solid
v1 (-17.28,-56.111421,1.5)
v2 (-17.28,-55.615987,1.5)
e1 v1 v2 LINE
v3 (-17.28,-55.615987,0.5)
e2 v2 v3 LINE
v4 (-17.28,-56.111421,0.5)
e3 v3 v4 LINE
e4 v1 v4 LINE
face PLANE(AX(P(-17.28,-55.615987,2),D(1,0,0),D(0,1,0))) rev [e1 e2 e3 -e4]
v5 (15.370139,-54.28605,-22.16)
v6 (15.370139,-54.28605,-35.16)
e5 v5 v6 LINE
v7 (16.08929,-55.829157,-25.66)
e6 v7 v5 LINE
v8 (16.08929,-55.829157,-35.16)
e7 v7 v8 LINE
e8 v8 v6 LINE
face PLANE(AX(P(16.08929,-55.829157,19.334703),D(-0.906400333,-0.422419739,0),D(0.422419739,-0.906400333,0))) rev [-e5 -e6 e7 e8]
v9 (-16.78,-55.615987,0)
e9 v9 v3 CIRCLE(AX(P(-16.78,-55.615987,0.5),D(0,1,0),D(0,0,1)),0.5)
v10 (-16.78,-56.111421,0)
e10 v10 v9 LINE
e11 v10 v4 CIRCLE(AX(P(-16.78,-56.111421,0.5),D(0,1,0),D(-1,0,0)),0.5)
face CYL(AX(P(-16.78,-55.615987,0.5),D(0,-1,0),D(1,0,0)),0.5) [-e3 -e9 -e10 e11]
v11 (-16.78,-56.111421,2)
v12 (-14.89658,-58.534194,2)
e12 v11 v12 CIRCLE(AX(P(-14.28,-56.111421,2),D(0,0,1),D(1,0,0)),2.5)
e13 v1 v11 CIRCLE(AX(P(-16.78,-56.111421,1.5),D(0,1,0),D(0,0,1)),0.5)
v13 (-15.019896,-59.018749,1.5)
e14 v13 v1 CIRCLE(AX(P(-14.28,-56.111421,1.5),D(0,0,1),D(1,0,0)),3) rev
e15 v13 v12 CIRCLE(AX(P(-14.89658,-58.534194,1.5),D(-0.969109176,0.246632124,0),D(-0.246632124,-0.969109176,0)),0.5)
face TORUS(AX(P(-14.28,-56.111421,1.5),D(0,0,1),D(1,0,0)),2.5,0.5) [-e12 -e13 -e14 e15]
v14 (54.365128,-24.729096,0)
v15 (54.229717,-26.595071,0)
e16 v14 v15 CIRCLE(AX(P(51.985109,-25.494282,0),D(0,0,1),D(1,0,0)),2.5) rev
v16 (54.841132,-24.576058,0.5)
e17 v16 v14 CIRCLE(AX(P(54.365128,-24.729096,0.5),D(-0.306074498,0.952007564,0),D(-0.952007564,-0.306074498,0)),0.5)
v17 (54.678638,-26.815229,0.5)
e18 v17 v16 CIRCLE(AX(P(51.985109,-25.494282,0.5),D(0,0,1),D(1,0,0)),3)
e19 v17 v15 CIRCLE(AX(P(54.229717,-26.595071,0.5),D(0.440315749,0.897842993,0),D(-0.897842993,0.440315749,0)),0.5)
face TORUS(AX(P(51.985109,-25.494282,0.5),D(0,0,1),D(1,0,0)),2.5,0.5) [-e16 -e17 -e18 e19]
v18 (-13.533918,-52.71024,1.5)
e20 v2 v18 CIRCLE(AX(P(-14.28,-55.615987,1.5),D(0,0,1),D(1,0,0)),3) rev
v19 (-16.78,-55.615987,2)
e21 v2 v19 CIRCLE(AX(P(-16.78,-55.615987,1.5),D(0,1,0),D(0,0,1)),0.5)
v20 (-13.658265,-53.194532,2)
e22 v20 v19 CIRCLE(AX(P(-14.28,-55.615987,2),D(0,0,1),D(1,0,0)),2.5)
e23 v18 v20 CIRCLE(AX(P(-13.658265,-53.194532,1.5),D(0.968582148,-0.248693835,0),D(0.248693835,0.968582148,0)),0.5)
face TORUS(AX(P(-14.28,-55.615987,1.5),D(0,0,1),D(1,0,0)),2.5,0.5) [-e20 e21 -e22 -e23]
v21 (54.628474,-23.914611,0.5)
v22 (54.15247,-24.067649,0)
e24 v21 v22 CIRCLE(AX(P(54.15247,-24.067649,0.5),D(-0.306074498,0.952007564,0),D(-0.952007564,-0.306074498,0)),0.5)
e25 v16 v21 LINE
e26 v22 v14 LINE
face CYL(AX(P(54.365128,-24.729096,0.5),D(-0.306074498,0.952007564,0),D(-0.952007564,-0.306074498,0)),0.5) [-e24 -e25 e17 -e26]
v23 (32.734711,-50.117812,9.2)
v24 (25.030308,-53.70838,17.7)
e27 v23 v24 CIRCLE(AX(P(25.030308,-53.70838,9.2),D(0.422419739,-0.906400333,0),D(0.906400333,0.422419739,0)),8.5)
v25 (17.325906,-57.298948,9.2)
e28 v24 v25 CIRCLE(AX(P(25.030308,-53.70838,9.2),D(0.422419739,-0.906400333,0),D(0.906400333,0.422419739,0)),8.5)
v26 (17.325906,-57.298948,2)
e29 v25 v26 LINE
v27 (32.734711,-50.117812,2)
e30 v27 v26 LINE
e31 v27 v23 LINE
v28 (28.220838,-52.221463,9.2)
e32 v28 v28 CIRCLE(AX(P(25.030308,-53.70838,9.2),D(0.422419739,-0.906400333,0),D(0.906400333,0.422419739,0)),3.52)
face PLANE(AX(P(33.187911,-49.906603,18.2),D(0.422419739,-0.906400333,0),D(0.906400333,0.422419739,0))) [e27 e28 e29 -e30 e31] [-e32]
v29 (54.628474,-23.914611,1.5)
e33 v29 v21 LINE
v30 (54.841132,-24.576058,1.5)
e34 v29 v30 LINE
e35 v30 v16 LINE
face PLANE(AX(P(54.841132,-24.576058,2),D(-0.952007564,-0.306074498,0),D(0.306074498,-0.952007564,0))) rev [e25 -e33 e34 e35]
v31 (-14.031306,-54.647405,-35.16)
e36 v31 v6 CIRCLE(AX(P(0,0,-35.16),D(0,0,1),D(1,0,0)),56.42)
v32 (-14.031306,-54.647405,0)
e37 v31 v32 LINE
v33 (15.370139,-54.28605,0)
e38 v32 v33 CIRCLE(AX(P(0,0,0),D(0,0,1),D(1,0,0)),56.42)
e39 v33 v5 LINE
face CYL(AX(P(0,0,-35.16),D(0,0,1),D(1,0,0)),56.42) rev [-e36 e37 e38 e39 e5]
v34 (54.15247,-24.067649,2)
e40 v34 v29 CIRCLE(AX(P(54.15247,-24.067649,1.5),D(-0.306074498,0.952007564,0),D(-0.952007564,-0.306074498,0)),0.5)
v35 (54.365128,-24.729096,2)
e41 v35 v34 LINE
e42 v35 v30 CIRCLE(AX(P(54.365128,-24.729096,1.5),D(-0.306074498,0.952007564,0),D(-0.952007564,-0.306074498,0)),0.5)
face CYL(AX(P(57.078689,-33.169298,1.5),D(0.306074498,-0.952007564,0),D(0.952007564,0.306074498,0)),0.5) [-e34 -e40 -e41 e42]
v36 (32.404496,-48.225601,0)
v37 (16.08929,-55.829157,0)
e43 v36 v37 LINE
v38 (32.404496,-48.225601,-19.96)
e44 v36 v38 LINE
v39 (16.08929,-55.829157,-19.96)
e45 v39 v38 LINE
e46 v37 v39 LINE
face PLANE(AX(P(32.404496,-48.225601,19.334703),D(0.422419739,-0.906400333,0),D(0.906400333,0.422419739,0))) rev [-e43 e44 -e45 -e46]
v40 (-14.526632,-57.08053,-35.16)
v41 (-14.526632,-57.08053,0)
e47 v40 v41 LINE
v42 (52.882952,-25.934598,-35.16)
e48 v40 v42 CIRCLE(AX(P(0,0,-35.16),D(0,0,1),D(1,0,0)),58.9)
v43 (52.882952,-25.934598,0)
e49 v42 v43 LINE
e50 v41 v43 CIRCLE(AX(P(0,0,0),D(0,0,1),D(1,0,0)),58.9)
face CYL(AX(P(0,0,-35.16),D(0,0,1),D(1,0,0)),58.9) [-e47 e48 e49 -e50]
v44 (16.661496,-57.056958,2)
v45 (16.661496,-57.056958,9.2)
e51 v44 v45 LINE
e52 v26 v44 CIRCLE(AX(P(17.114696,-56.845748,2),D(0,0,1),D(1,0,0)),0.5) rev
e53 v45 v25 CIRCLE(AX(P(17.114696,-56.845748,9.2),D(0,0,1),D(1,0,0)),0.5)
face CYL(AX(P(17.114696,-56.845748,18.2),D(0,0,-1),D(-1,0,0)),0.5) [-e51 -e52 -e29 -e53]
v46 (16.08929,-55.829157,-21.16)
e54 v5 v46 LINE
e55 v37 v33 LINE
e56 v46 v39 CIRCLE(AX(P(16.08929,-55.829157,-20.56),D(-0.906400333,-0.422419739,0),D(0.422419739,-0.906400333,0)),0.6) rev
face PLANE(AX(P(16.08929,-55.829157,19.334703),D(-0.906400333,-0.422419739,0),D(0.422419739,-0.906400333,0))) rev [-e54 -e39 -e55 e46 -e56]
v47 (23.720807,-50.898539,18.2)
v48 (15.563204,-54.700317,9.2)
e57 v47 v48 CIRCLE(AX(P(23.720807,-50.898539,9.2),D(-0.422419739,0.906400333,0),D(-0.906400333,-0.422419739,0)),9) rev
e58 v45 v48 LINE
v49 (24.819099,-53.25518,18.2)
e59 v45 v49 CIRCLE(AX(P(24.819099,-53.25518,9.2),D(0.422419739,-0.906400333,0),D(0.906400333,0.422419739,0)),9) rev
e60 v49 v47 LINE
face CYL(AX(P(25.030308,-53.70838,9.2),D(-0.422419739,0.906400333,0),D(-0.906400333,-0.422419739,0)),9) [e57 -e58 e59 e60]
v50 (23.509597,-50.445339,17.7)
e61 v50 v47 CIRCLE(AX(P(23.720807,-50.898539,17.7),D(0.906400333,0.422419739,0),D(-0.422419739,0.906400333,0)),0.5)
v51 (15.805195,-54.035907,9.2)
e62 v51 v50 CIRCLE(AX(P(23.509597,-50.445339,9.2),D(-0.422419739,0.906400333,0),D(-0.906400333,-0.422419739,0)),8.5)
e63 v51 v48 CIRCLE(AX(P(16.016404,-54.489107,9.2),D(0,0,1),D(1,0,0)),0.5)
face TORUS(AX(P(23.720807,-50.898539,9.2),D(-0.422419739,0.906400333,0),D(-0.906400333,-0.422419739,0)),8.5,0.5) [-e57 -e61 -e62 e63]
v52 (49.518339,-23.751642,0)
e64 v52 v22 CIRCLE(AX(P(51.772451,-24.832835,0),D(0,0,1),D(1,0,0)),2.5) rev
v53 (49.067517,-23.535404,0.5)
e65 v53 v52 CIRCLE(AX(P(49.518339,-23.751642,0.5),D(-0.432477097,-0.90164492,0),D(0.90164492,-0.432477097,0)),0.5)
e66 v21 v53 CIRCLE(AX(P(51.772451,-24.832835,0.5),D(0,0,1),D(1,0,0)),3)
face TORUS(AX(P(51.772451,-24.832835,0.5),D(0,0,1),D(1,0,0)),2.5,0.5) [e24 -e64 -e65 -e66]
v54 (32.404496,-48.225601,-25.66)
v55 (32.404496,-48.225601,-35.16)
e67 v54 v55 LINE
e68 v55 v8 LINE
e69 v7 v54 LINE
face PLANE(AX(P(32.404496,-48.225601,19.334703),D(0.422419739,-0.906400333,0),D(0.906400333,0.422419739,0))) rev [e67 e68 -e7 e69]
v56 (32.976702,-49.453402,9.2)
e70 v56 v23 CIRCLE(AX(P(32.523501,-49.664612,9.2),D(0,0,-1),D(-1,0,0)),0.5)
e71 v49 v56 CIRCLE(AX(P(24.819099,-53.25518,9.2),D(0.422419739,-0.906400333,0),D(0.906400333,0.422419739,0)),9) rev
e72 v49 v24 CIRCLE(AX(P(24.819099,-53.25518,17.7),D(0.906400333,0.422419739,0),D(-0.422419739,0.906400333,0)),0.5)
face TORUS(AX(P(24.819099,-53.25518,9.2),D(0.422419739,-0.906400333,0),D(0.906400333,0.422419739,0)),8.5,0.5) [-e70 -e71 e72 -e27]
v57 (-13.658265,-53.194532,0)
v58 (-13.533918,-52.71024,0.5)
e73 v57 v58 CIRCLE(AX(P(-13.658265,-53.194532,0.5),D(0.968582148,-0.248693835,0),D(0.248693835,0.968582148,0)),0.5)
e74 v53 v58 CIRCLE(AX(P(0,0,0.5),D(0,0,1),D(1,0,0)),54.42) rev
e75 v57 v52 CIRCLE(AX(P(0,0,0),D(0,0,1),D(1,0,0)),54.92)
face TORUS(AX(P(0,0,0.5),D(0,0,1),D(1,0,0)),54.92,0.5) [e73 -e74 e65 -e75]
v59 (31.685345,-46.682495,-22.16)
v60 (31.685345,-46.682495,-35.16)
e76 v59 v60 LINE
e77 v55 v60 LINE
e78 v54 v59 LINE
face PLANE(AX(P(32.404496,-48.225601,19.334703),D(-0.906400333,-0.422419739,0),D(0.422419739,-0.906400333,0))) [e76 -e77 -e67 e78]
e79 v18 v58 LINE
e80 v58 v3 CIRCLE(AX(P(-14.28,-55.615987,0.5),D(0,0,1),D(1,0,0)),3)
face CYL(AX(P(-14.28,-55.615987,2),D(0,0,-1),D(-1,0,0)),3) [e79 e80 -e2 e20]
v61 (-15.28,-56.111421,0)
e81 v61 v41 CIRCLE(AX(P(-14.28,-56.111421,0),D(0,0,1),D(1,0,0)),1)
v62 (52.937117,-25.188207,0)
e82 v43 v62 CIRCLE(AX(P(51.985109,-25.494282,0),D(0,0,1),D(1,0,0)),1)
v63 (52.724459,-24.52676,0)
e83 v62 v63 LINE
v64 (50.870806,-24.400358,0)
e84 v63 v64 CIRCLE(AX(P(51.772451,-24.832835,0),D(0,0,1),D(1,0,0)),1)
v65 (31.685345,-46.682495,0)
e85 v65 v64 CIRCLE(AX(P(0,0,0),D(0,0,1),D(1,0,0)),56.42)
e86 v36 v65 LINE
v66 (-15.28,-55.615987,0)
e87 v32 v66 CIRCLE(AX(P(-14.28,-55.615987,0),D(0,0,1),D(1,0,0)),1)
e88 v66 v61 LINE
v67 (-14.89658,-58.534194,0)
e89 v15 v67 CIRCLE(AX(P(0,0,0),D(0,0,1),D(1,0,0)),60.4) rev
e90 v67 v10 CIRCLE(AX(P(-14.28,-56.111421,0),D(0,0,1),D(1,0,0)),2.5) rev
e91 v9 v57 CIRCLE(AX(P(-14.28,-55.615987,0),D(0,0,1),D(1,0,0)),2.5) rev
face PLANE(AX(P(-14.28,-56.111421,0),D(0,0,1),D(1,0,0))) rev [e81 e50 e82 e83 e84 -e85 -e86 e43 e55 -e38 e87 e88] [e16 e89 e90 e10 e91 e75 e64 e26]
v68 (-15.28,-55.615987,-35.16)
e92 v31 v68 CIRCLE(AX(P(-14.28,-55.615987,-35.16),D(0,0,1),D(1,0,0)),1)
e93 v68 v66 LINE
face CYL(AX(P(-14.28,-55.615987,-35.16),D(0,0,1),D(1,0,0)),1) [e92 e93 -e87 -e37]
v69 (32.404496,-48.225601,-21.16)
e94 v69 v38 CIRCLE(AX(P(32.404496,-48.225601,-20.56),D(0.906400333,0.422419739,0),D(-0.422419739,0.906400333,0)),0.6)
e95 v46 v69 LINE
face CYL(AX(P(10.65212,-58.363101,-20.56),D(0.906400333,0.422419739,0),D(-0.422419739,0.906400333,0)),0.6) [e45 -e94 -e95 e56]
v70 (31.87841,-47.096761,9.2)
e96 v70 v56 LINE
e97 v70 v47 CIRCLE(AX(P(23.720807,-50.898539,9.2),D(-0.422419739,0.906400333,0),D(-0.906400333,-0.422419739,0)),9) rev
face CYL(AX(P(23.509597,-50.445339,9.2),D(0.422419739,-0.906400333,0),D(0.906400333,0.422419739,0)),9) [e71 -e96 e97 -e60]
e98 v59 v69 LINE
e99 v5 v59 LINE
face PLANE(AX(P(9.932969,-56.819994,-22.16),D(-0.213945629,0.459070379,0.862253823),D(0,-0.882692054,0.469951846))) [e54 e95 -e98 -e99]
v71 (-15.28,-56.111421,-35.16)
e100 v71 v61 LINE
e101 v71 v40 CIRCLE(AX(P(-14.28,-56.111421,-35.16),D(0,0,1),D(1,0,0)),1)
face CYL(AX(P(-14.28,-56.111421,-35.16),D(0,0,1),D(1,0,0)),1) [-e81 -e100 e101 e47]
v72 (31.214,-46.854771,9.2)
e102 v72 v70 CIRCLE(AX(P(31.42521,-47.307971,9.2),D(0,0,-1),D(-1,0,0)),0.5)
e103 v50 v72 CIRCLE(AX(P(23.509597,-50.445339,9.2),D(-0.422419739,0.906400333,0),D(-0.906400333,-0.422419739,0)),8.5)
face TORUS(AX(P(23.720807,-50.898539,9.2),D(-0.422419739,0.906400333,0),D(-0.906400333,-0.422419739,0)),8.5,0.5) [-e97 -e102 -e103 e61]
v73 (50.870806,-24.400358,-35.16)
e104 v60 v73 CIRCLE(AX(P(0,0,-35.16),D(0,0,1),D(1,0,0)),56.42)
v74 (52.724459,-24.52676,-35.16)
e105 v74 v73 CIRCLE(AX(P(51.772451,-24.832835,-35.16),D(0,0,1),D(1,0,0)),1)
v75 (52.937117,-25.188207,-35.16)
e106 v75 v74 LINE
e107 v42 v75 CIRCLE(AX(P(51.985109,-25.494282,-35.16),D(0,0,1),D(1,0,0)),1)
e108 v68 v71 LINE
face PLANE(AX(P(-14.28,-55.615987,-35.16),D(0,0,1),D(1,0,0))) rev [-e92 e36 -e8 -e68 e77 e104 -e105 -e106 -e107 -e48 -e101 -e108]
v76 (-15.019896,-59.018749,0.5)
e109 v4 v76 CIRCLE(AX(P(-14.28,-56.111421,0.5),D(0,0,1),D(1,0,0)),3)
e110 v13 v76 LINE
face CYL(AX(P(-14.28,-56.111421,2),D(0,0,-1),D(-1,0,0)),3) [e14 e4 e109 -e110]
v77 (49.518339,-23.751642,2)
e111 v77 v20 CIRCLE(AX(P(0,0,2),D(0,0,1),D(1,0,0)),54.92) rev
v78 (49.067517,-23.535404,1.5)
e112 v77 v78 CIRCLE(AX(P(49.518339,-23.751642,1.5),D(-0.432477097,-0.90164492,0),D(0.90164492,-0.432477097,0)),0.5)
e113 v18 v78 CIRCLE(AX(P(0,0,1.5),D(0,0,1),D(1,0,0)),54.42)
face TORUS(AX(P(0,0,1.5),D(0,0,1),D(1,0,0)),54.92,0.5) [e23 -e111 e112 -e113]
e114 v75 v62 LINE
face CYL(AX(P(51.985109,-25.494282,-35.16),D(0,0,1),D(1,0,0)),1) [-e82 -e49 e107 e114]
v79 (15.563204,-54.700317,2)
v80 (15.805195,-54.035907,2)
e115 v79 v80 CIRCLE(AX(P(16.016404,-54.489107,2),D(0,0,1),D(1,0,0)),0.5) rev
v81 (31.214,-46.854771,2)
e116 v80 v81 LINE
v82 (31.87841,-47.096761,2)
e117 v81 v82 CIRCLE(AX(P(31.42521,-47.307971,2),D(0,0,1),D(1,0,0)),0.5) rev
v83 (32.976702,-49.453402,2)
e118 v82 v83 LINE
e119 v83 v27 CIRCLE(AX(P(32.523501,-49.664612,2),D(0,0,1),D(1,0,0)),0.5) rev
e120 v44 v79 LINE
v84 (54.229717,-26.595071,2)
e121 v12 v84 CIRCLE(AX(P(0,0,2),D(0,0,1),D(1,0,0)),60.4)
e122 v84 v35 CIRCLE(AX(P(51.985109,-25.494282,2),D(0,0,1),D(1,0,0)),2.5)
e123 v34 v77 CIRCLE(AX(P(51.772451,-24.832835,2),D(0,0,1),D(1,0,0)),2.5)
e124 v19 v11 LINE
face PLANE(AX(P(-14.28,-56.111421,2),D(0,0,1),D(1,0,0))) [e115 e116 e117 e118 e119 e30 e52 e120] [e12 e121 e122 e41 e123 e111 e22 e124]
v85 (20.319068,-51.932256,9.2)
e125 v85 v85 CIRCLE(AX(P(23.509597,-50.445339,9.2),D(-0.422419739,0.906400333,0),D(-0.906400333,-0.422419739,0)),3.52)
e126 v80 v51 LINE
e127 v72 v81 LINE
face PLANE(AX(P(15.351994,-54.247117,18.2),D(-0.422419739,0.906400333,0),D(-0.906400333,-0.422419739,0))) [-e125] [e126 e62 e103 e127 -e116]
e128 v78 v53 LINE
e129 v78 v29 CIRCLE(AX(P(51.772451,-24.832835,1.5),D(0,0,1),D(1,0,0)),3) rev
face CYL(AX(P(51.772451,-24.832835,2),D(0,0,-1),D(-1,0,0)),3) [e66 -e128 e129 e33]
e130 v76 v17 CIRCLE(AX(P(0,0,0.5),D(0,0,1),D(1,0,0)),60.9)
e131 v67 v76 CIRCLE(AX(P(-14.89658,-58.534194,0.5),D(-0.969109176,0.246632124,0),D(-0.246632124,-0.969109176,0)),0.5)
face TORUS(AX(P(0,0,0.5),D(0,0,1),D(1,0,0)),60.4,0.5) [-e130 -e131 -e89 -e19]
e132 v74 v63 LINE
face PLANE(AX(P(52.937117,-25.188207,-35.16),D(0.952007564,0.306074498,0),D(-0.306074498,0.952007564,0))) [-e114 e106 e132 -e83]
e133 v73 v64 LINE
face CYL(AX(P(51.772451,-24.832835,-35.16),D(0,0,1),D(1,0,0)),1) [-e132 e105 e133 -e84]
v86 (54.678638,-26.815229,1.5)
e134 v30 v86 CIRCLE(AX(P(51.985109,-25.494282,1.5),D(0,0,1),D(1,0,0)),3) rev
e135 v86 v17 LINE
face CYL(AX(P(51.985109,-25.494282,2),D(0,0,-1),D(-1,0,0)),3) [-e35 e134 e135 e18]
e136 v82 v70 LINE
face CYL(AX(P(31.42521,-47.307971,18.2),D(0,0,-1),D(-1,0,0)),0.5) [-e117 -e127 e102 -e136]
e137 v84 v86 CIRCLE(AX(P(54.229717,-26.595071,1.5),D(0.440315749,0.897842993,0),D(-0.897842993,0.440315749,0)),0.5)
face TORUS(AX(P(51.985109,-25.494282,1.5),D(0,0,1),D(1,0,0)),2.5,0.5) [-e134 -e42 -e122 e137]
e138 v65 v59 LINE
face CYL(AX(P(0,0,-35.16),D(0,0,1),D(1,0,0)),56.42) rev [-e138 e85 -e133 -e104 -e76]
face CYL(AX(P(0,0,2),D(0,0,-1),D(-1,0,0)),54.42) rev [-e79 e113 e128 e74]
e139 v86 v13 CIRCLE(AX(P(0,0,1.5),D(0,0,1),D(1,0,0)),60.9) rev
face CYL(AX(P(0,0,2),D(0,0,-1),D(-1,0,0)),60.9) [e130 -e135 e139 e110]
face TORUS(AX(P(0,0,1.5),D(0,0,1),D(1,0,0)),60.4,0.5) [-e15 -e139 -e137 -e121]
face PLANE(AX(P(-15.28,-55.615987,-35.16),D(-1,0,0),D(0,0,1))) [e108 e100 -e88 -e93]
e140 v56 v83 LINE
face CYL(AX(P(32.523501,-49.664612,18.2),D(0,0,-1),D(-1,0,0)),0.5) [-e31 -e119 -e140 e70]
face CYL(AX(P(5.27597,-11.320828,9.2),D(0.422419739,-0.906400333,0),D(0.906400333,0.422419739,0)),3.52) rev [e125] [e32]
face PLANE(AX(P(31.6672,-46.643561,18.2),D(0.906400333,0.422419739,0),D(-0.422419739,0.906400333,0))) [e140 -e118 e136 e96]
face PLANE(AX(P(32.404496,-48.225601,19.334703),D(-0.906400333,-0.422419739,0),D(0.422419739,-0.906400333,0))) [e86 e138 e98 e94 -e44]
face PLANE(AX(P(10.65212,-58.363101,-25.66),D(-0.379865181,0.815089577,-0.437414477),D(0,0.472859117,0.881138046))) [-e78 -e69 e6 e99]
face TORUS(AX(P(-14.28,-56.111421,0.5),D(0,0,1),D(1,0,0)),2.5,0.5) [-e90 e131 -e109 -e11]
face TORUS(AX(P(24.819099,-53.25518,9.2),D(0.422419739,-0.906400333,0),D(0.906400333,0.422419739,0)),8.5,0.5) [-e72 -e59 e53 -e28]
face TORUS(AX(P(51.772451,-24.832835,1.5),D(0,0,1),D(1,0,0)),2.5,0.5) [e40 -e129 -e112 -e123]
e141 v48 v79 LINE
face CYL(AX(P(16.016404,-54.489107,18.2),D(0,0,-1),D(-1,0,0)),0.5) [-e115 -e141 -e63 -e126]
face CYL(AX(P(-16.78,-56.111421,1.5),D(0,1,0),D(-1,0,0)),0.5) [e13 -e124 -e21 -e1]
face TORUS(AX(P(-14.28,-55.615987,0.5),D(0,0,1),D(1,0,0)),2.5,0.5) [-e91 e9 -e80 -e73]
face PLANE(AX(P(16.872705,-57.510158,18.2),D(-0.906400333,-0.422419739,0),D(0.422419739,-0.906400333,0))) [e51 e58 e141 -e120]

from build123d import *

# Parameters (mm, degrees)
BASE_EXTRUDE_DEPTH  = 2
BOSS_EXTRUDE1_DEPTH = 37.16
BOSS_EXTRUDE2_DEPTH = 16.2
FILLET1_R           = 9
SKETCH4_R           = 3.52
CUT_EXTRUDE1_DEPTH  = 64.580171374
FILLET3_R           = 0.5
CUT_EXTRUDE3_START  = -35.16
CUT_EXTRUDE3_DEPTH  = 35.16
BOSS_EXTRUDE3_REACH = 89.266


# Read off the part's stored shape, not the designer's step: Cut-Extrude3
with BuildPart() as part:
    # Sketch1 → Base-Extrude (new body)
    with BuildSketch(Plane.XY):
        with BuildLine():
            Line((54.84113201, -24.576058398), (54.628473973, -23.914611391))
            ThreePointArc((54.628473973, -23.914611391), (51.976550593, -21.839785691), (49.067516522, -23.535403595))
            ThreePointArc((49.067516522, -23.535403595), (22.988082213, -49.326306127), (-13.533918495, -52.710240468))
            ThreePointArc((-13.533918495, -52.710240468), (-16.11871633, -53.245518126), (-17.28, -55.61598691))
            Line((-17.28, -55.61598691), (-17.28, -56.111421297))
            ThreePointArc((-17.28, -56.111421297), (-16.648511043, -57.952658773), (-15.019896373, -59.018748826))
            ThreePointArc((-15.019896373, -59.018748826), (25.543504513, -55.284169318), (54.678638299, -26.815229139))
            ThreePointArc((54.678638299, -26.815229139), (54.977241057, -25.711417004), (54.84113201, -24.576058398))
        make_face()
    extrude(amount=BASE_EXTRUDE_DEPTH)

    # Sketch2 → Boss-Extrude1 (add)
    with BuildSketch(Plane.XY.offset(2)):
        with BuildLine():
            Line((-15.28, -55.61598691), (-15.28, -56.111421297))
            ThreePointArc((-15.28, -56.111421297), (-15.069503681, -56.725167122), (-14.526632124, -57.080530473))
            ThreePointArc((-14.526632124, -57.080530473), (24.70463737, -53.468597255), (52.882952312, -25.934597641))
            ThreePointArc((52.882952312, -25.934597641), (52.982486565, -25.566660262), (52.937116882, -25.188207393))
            Line((52.937116882, -25.188207393), (52.724458845, -24.526760386))
            ThreePointArc((52.724458845, -24.526760386), (51.840484385, -23.83515182), (50.870806361, -24.400357788))
            ThreePointArc((50.870806361, -24.400357788), (23.832921691, -51.139106794), (-14.031306165, -54.647404763))
            ThreePointArc((-14.031306165, -54.647404763), (-14.892905443, -54.825830649), (-15.28, -55.61598691))
        make_face()
    extrude(amount=-BOSS_EXTRUDE1_DEPTH)

    # Sketch3 → Boss-Extrude2 (add)
    with BuildSketch(Plane.XY.offset(2)):
        Polygon((31.667200425, -46.643561321), (33.187911486, -49.906602521), (16.872705491, -57.510157828), (15.351994429, -54.247116629), align=None)
    extrude(amount=BOSS_EXTRUDE2_DEPTH)

    # Fillet1
    fillet1_edges = [part.edges().sort_by_distance(p)[0] for p in [
        (16.11234996, -55.878637228, 18.2),
        (32.427555956, -48.275081921, 18.2),
    ]]
    fillet(fillet1_edges, radius=FILLET1_R - 0.0001)  # a hair under: the kernel refuses the full size

    # Sketch4 → Cut-Extrude1 (cut, through all)
    with BuildSketch(Plane(origin=(25.030308488, -53.708380174, 0), x_dir=(0.9064003331019249, 0.4224197393028875, 0), z_dir=(0.42241973930288756, -0.906400333101925, 0))):
        with Locations((0, 9.2)):
            Circle(SKETCH4_R)
    extrude(amount=-CUT_EXTRUDE1_DEPTH, mode=Mode.SUBTRACT)

    # Fillet3
    fillet3_edges = [part.edges().sort_by_distance(p)[0] for p in [
        (54.977241057, -25.711417004, 2),
        (25.543504513, -55.284169318, 0),
        (-16.648511043, -57.952658773, 0),
        (54.734802991, -24.245334894, 2),
        (51.976550593, -21.839785691, 2),
        (22.988082213, -49.326306127, 2),
        (-16.11871633, -53.245518126, 2),
        (-17.28, -55.863704104, 2),
        (-16.648511043, -57.952658773, 2),
        (25.543504513, -55.284169318, 2),
        (16.872705491, -57.510157828, 5.60005),
        (15.351994429, -54.247116629, 5.60005),
        (31.667200425, -46.643561321, 5.60005),
        (29.277920373, -47.757063843, 15.56399032),
        (17.741274481, -53.133614107, 15.56399032),
        (33.187911486, -49.906602521, 5.60005),
        (30.798631434, -51.020105042, 15.56399032),
        (-17.28, -55.863704104, 0),
        (19.261985543, -56.396655306, 15.56399032),
        (-16.11871633, -53.245518126, 0),
        (22.988082213, -49.326306127, 0),
        (51.976550593, -21.839785691, 0),
        (54.734802991, -24.245334894, 0),
        (54.977241057, -25.711417004, 0),
    ]]
    fillet(fillet3_edges, radius=FILLET3_R)

    # Cut-Extrude3 outline → Cut-Extrude3 (cut)
    with BuildSketch(Plane(origin=(0, 0, -35.16), x_dir=(-1, 0, 0), z_dir=(0, 0, -1)).offset(CUT_EXTRUDE3_START)):
        with BuildLine():
            Line((-31.685344985, -46.682494719), (-32.404496034, -48.225601466))
            Line((-32.404496034, -48.225601466), (-16.089290038, -55.829156774))
            Line((-16.089290038, -55.829156774), (-15.370138989, -54.286050026))
            ThreePointArc((-15.370138989, -54.286050026), (-23.832921691, -51.139106794), (-31.685344985, -46.682494719))
        make_face()
    extrude(amount=CUT_EXTRUDE3_DEPTH, mode=Mode.SUBTRACT)

    # Sketch7 → Boss-Extrude3 (add, up to next)
    with BuildSketch(Plane(origin=(8.157602998, 3.801777654, 0), x_dir=(0, 0, 1), z_dir=(-0.9064003331019256, -0.42241973930288634, 0)), mode=Mode.PRIVATE) as boss_extrude3_sk1:
        with BuildLine():
            Line((-25.66, -57.4), (-22.16, -55.697543931))
            Line((-22.16, -55.697543931), (-21.16, -57.4))
            ThreePointArc((-21.16, -57.4), (-20.56, -56.8), (-19.96, -57.4))
            Line((-19.96, -57.4), (-21.16, -57.566686604))
            Line((-21.16, -57.566686604), (-25.66, -57.4))
        make_face()
    boss_extrude3_tool1 = extrude(boss_extrude3_sk1.sketch, amount=BOSS_EXTRUDE3_REACH, mode=Mode.PRIVATE) - part.part
    add(boss_extrude3_tool1.solids().sort_by_distance((32.205788, -47.799227, -22.639326))[0])
    add(boss_extrude3_tool1.solids().sort_by_distance((32.205788, -47.799227, -22.639326))[1])


solid = part.part
